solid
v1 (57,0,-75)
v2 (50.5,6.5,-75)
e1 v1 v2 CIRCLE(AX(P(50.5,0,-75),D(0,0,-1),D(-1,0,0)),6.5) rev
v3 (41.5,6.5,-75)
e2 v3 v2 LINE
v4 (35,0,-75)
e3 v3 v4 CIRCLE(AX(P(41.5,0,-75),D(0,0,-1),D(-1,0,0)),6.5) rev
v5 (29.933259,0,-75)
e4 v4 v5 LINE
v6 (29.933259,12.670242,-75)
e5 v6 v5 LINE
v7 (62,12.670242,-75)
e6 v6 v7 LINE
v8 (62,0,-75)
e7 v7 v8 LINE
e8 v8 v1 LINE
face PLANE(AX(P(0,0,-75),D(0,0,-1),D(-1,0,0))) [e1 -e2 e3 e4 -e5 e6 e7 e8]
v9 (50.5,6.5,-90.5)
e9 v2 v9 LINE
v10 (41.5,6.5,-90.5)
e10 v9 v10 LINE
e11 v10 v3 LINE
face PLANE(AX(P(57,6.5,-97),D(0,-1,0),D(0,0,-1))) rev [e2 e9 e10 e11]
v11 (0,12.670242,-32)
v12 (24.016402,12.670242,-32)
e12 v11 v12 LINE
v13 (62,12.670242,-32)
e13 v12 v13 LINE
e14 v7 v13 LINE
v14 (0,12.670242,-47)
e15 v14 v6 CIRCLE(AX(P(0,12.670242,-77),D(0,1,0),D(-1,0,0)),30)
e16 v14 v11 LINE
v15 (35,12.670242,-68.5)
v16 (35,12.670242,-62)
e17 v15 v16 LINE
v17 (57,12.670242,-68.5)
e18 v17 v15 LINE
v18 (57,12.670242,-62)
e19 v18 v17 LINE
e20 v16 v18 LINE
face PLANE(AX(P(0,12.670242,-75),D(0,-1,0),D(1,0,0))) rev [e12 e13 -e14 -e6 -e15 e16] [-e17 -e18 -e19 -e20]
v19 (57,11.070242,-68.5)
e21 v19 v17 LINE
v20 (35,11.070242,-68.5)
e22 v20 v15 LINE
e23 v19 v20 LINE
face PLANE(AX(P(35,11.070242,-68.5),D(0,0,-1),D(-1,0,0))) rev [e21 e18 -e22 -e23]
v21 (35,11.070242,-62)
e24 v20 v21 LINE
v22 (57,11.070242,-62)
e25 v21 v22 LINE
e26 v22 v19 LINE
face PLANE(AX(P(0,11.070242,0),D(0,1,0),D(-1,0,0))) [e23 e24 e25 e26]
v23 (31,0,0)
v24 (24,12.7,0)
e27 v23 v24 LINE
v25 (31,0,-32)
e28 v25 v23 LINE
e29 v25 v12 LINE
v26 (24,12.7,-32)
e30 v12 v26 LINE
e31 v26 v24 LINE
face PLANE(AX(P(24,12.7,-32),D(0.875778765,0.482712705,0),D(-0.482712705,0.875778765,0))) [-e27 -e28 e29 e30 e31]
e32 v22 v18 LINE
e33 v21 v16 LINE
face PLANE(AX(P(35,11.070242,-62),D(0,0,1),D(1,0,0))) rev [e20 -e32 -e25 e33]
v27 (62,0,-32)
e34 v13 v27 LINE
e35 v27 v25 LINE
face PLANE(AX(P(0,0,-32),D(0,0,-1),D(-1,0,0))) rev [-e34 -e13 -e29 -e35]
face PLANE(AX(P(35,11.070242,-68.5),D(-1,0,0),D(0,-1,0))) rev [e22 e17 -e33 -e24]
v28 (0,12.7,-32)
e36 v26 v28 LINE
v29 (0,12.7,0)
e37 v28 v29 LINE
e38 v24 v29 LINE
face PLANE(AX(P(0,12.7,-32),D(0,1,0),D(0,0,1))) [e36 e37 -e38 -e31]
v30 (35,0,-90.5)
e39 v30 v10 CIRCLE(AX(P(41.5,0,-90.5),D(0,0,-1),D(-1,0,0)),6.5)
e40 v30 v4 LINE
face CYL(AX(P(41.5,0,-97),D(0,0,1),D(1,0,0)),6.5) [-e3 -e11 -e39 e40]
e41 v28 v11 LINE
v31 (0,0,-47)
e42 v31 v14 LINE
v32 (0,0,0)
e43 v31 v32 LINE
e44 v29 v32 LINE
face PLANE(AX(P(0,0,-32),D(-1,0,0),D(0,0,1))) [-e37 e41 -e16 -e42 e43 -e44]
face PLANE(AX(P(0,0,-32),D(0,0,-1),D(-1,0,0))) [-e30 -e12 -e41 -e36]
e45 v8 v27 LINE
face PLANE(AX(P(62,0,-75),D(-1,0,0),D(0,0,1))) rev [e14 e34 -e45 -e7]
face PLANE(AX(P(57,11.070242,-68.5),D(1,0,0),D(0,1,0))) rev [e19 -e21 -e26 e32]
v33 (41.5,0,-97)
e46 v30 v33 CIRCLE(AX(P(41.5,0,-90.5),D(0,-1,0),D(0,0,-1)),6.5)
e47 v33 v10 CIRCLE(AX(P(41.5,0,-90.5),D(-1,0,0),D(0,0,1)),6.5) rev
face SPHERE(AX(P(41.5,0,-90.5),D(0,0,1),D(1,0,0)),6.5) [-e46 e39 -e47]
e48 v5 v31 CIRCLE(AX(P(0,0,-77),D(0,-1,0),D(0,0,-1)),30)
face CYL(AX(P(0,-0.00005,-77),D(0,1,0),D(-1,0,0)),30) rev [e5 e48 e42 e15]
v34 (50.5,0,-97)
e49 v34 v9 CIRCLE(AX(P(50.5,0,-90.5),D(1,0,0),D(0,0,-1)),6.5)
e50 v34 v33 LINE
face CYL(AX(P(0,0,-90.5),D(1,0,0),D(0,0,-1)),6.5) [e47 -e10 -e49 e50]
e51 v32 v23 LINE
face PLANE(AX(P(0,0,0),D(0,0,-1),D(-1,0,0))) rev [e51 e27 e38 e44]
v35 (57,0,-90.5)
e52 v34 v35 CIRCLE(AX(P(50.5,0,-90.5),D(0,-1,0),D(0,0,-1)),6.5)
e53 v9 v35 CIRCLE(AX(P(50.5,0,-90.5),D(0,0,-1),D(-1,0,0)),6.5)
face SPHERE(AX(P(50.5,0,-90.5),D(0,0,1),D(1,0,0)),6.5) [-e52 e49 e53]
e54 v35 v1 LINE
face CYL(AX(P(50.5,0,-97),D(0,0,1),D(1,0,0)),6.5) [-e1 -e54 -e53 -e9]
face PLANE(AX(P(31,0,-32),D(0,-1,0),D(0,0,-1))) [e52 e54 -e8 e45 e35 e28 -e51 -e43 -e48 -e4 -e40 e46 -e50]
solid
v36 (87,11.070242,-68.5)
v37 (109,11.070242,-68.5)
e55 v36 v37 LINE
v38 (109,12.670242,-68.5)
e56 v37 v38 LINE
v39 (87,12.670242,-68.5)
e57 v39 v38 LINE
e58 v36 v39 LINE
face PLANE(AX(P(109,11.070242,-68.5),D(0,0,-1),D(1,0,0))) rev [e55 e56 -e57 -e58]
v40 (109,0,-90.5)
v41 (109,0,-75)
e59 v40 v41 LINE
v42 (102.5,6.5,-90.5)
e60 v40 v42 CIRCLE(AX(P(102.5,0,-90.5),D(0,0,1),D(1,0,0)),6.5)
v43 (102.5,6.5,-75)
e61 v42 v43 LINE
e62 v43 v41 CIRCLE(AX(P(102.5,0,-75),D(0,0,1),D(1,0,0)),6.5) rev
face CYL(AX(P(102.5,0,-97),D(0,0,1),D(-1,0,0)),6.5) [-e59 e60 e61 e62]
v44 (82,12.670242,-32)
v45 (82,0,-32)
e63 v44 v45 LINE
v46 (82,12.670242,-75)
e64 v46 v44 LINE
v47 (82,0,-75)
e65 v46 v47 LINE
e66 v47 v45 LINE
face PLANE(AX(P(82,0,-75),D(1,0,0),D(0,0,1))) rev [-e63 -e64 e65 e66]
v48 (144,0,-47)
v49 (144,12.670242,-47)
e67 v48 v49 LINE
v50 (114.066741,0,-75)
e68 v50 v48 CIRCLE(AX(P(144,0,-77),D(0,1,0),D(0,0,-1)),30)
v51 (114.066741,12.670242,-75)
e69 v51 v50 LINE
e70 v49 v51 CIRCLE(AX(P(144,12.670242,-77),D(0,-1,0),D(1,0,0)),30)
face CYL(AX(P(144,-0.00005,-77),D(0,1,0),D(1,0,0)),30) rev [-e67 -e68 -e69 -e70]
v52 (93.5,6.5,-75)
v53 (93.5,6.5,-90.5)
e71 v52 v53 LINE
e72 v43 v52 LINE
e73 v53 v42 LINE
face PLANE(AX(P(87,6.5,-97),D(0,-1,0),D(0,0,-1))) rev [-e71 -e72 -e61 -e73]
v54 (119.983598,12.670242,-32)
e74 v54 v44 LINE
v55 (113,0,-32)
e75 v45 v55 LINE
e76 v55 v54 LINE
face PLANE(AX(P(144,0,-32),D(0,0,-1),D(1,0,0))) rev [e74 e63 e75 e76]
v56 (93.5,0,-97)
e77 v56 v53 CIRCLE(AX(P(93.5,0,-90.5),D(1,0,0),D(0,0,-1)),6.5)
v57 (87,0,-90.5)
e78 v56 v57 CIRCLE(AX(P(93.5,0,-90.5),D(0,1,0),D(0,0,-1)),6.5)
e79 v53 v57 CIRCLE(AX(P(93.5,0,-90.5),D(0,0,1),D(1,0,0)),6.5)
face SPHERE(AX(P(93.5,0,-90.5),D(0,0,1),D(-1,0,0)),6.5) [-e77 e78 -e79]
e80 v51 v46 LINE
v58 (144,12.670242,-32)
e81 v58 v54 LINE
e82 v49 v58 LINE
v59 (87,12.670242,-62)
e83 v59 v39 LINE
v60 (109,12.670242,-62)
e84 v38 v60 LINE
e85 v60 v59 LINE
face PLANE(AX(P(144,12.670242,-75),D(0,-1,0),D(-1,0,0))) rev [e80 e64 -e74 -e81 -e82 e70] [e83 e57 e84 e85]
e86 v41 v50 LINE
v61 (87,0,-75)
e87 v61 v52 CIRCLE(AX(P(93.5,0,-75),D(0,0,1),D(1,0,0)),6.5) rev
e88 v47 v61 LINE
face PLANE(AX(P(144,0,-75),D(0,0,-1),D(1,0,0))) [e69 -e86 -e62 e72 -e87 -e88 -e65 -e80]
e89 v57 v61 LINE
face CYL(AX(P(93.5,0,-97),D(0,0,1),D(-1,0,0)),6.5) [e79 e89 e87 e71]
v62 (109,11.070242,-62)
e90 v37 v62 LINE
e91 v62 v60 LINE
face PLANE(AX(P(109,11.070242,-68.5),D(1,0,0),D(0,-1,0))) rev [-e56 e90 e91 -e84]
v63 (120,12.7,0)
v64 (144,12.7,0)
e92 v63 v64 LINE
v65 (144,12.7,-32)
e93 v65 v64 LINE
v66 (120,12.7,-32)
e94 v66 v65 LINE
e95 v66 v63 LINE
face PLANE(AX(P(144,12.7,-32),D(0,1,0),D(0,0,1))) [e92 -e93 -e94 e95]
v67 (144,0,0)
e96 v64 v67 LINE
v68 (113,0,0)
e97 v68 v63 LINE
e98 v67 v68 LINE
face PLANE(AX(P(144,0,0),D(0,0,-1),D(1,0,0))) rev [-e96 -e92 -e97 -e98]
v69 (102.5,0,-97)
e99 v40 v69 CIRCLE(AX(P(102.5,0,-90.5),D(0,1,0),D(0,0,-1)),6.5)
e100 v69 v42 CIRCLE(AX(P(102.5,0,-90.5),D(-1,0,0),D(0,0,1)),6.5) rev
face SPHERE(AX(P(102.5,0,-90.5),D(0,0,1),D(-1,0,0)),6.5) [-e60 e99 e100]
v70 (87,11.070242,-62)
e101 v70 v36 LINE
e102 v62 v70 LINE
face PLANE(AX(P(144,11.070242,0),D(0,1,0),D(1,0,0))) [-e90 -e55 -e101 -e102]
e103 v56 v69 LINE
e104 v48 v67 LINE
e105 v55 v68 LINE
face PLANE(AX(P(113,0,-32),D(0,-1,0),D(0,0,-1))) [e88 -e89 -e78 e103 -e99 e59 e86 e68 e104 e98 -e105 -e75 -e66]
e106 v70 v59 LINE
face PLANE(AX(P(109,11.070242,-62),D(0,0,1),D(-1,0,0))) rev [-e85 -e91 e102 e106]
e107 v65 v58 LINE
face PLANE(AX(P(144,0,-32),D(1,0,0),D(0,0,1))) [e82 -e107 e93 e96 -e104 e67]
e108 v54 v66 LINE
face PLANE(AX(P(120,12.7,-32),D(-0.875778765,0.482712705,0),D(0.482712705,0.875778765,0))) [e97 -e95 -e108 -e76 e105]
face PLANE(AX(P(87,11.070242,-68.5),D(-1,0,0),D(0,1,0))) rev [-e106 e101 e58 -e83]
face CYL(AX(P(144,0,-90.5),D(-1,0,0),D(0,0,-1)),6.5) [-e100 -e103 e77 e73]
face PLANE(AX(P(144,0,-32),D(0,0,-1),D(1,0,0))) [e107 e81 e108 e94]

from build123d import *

# Parameters (mm, degrees)
EXTRUDE_1_DEPTH     = 32
SKETCH_2_W          = 62
SKETCH_2_H          = 12.670241622
EXTRUDE_2_DEPTH     = 43
SKETCH_3_R          = 30
CUT_EXTRUDE_1_DEPTH = 99.130194246
SKETCH_4_W          = 22
SKETCH_4_H          = 6.5
EXTRUDE_3_DEPTH     = 22
FILLET_1_R          = 6.5
SKETCH_5_W          = 22
SKETCH_5_H          = 6.5
CUT_EXTRUDE_2_DEPTH = 1.6


with BuildPart() as part:
    # Эскиз1 → Бобышка-Вытянуть1 (new body)
    with BuildSketch(Plane.XY):
        Polygon((0, 0), (0, 12.7), (24, 12.7), (31, 0), align=None)
    extrude(amount=-EXTRUDE_1_DEPTH)

    # Эскиз2 → Бобышка-Вытянуть2 (add)
    with BuildSketch(Plane(origin=(0, 0, -32), x_dir=(-1, 0, 0), z_dir=(0, 0, -1))):
        with Locations((-31, 6.335120811)):
            Rectangle(SKETCH_2_W, SKETCH_2_H)
    extrude(amount=EXTRUDE_2_DEPTH)

    # Эскиз3 → Вырез-Вытянуть1 (cut, through all)
    with BuildSketch(Plane(origin=(0, 12.670241622, 0), x_dir=(1, 0, 0), z_dir=(0, 1, 0))):
        with Locations((0, 77)):
            Circle(SKETCH_3_R)
    extrude(amount=-CUT_EXTRUDE_1_DEPTH, mode=Mode.SUBTRACT)

    # Эскиз4 → Бобышка-Вытянуть3 (add)
    with BuildSketch(Plane(origin=(0, 0, -75), x_dir=(-1, 0, 0), z_dir=(0, 0, -1))):
        with Locations((-46, 3.25)):
            Rectangle(SKETCH_4_W, SKETCH_4_H)
    extrude(amount=EXTRUDE_3_DEPTH)

    # Скругление1
    # the kernel refuses this fillet: 6.5 mm, written as the material it adds along each edge
    # the kernel refuses this fillet: 6.5 mm, written as the material it takes off along each edge
    with BuildSketch(Plane(origin=(50.5, 0, -90.5), x_dir=(0, 1, 0), z_dir=(1, 0, 0))) as fillet_1_2_piece_1_section:
        Polygon((0, 0), (FILLET_1_R * 1.02, 0), (FILLET_1_R * 1.02, -FILLET_1_R * 1.02), (0, -FILLET_1_R * 1.02), align=None)
    fillet_1_2_piece_1 = extrude(amount=FILLET_1_R * 1.02, mode=Mode.PRIVATE)
    fillet_1_2_piece_1 = fillet_1_2_piece_1 - Plane(origin=(50.5, 0, -90.5), x_dir=(0, -0.7071067811865475, 0.7071067811865475), z_dir=(1, 0, 0)) * Sphere(FILLET_1_R, mode=Mode.PRIVATE)
    add(fillet_1_2_piece_1, mode=Mode.SUBTRACT)
    with BuildSketch(Plane(origin=(41.5, 0, -90.5), x_dir=(-1, 0, 0), z_dir=(0, 1, 0))) as fillet_1_2_piece_2_section:
        Polygon((0, 0), (FILLET_1_R * 1.02, 0), (FILLET_1_R * 1.02, -FILLET_1_R * 1.02), (0, -FILLET_1_R * 1.02), align=None)
    fillet_1_2_piece_2 = extrude(amount=FILLET_1_R * 1.02, mode=Mode.PRIVATE)
    fillet_1_2_piece_2 = fillet_1_2_piece_2 - Plane(origin=(41.5, 0, -90.5), x_dir=(0.7071067811865475, 0, 0.7071067811865475), z_dir=(0, 1, 0)) * Sphere(FILLET_1_R, mode=Mode.PRIVATE)
    add(fillet_1_2_piece_2, mode=Mode.SUBTRACT)
    with BuildSketch(Plane(origin=(57, 6.5, -75), x_dir=(0, -1, 0), z_dir=(0, 0, -1)), Plane(origin=(35, 6.5, -75), x_dir=(1, 0, 0), z_dir=(0, 0, -1))) as fillet_1_2_piece_3:
        with BuildLine():
            CenterArc((FILLET_1_R, FILLET_1_R), FILLET_1_R, 180, 90)
            Line((0, FILLET_1_R), (0, 0))
            Line((0, 0), (FILLET_1_R, 0))
        make_face()
    extrude(amount=15.5, mode=Mode.SUBTRACT)
    with BuildSketch(Plane(origin=(41.5, 6.5, -97), x_dir=(0, 0, 1), z_dir=(1, 0, 0))) as fillet_1_2_piece_4:
        with BuildLine():
            CenterArc((FILLET_1_R, FILLET_1_R), FILLET_1_R, 180, 90)
            Line((0, FILLET_1_R), (0, 0))
            Line((0, 0), (FILLET_1_R, 0))
        make_face()
    extrude(amount=9, mode=Mode.SUBTRACT)

    # Эскиз5 → Вырез-Вытянуть2 (cut)
    with BuildSketch(Plane(origin=(0, 12.670241622, 0), x_dir=(1, 0, 0), z_dir=(0, 1, 0))):
        with Locations((46, 65.25)):
            Rectangle(SKETCH_5_W, SKETCH_5_H)
    extrude(amount=-CUT_EXTRUDE_2_DEPTH, mode=Mode.SUBTRACT)


with BuildPart() as body_2:
    # Зеркальное отражение1: mirrored copy
    add(part.part.mirror(Plane(origin=(72, 0, 0), x_dir=(0, 0, 1), z_dir=(1, 0, 0))))


solid = Compound([part.part, body_2.part])
